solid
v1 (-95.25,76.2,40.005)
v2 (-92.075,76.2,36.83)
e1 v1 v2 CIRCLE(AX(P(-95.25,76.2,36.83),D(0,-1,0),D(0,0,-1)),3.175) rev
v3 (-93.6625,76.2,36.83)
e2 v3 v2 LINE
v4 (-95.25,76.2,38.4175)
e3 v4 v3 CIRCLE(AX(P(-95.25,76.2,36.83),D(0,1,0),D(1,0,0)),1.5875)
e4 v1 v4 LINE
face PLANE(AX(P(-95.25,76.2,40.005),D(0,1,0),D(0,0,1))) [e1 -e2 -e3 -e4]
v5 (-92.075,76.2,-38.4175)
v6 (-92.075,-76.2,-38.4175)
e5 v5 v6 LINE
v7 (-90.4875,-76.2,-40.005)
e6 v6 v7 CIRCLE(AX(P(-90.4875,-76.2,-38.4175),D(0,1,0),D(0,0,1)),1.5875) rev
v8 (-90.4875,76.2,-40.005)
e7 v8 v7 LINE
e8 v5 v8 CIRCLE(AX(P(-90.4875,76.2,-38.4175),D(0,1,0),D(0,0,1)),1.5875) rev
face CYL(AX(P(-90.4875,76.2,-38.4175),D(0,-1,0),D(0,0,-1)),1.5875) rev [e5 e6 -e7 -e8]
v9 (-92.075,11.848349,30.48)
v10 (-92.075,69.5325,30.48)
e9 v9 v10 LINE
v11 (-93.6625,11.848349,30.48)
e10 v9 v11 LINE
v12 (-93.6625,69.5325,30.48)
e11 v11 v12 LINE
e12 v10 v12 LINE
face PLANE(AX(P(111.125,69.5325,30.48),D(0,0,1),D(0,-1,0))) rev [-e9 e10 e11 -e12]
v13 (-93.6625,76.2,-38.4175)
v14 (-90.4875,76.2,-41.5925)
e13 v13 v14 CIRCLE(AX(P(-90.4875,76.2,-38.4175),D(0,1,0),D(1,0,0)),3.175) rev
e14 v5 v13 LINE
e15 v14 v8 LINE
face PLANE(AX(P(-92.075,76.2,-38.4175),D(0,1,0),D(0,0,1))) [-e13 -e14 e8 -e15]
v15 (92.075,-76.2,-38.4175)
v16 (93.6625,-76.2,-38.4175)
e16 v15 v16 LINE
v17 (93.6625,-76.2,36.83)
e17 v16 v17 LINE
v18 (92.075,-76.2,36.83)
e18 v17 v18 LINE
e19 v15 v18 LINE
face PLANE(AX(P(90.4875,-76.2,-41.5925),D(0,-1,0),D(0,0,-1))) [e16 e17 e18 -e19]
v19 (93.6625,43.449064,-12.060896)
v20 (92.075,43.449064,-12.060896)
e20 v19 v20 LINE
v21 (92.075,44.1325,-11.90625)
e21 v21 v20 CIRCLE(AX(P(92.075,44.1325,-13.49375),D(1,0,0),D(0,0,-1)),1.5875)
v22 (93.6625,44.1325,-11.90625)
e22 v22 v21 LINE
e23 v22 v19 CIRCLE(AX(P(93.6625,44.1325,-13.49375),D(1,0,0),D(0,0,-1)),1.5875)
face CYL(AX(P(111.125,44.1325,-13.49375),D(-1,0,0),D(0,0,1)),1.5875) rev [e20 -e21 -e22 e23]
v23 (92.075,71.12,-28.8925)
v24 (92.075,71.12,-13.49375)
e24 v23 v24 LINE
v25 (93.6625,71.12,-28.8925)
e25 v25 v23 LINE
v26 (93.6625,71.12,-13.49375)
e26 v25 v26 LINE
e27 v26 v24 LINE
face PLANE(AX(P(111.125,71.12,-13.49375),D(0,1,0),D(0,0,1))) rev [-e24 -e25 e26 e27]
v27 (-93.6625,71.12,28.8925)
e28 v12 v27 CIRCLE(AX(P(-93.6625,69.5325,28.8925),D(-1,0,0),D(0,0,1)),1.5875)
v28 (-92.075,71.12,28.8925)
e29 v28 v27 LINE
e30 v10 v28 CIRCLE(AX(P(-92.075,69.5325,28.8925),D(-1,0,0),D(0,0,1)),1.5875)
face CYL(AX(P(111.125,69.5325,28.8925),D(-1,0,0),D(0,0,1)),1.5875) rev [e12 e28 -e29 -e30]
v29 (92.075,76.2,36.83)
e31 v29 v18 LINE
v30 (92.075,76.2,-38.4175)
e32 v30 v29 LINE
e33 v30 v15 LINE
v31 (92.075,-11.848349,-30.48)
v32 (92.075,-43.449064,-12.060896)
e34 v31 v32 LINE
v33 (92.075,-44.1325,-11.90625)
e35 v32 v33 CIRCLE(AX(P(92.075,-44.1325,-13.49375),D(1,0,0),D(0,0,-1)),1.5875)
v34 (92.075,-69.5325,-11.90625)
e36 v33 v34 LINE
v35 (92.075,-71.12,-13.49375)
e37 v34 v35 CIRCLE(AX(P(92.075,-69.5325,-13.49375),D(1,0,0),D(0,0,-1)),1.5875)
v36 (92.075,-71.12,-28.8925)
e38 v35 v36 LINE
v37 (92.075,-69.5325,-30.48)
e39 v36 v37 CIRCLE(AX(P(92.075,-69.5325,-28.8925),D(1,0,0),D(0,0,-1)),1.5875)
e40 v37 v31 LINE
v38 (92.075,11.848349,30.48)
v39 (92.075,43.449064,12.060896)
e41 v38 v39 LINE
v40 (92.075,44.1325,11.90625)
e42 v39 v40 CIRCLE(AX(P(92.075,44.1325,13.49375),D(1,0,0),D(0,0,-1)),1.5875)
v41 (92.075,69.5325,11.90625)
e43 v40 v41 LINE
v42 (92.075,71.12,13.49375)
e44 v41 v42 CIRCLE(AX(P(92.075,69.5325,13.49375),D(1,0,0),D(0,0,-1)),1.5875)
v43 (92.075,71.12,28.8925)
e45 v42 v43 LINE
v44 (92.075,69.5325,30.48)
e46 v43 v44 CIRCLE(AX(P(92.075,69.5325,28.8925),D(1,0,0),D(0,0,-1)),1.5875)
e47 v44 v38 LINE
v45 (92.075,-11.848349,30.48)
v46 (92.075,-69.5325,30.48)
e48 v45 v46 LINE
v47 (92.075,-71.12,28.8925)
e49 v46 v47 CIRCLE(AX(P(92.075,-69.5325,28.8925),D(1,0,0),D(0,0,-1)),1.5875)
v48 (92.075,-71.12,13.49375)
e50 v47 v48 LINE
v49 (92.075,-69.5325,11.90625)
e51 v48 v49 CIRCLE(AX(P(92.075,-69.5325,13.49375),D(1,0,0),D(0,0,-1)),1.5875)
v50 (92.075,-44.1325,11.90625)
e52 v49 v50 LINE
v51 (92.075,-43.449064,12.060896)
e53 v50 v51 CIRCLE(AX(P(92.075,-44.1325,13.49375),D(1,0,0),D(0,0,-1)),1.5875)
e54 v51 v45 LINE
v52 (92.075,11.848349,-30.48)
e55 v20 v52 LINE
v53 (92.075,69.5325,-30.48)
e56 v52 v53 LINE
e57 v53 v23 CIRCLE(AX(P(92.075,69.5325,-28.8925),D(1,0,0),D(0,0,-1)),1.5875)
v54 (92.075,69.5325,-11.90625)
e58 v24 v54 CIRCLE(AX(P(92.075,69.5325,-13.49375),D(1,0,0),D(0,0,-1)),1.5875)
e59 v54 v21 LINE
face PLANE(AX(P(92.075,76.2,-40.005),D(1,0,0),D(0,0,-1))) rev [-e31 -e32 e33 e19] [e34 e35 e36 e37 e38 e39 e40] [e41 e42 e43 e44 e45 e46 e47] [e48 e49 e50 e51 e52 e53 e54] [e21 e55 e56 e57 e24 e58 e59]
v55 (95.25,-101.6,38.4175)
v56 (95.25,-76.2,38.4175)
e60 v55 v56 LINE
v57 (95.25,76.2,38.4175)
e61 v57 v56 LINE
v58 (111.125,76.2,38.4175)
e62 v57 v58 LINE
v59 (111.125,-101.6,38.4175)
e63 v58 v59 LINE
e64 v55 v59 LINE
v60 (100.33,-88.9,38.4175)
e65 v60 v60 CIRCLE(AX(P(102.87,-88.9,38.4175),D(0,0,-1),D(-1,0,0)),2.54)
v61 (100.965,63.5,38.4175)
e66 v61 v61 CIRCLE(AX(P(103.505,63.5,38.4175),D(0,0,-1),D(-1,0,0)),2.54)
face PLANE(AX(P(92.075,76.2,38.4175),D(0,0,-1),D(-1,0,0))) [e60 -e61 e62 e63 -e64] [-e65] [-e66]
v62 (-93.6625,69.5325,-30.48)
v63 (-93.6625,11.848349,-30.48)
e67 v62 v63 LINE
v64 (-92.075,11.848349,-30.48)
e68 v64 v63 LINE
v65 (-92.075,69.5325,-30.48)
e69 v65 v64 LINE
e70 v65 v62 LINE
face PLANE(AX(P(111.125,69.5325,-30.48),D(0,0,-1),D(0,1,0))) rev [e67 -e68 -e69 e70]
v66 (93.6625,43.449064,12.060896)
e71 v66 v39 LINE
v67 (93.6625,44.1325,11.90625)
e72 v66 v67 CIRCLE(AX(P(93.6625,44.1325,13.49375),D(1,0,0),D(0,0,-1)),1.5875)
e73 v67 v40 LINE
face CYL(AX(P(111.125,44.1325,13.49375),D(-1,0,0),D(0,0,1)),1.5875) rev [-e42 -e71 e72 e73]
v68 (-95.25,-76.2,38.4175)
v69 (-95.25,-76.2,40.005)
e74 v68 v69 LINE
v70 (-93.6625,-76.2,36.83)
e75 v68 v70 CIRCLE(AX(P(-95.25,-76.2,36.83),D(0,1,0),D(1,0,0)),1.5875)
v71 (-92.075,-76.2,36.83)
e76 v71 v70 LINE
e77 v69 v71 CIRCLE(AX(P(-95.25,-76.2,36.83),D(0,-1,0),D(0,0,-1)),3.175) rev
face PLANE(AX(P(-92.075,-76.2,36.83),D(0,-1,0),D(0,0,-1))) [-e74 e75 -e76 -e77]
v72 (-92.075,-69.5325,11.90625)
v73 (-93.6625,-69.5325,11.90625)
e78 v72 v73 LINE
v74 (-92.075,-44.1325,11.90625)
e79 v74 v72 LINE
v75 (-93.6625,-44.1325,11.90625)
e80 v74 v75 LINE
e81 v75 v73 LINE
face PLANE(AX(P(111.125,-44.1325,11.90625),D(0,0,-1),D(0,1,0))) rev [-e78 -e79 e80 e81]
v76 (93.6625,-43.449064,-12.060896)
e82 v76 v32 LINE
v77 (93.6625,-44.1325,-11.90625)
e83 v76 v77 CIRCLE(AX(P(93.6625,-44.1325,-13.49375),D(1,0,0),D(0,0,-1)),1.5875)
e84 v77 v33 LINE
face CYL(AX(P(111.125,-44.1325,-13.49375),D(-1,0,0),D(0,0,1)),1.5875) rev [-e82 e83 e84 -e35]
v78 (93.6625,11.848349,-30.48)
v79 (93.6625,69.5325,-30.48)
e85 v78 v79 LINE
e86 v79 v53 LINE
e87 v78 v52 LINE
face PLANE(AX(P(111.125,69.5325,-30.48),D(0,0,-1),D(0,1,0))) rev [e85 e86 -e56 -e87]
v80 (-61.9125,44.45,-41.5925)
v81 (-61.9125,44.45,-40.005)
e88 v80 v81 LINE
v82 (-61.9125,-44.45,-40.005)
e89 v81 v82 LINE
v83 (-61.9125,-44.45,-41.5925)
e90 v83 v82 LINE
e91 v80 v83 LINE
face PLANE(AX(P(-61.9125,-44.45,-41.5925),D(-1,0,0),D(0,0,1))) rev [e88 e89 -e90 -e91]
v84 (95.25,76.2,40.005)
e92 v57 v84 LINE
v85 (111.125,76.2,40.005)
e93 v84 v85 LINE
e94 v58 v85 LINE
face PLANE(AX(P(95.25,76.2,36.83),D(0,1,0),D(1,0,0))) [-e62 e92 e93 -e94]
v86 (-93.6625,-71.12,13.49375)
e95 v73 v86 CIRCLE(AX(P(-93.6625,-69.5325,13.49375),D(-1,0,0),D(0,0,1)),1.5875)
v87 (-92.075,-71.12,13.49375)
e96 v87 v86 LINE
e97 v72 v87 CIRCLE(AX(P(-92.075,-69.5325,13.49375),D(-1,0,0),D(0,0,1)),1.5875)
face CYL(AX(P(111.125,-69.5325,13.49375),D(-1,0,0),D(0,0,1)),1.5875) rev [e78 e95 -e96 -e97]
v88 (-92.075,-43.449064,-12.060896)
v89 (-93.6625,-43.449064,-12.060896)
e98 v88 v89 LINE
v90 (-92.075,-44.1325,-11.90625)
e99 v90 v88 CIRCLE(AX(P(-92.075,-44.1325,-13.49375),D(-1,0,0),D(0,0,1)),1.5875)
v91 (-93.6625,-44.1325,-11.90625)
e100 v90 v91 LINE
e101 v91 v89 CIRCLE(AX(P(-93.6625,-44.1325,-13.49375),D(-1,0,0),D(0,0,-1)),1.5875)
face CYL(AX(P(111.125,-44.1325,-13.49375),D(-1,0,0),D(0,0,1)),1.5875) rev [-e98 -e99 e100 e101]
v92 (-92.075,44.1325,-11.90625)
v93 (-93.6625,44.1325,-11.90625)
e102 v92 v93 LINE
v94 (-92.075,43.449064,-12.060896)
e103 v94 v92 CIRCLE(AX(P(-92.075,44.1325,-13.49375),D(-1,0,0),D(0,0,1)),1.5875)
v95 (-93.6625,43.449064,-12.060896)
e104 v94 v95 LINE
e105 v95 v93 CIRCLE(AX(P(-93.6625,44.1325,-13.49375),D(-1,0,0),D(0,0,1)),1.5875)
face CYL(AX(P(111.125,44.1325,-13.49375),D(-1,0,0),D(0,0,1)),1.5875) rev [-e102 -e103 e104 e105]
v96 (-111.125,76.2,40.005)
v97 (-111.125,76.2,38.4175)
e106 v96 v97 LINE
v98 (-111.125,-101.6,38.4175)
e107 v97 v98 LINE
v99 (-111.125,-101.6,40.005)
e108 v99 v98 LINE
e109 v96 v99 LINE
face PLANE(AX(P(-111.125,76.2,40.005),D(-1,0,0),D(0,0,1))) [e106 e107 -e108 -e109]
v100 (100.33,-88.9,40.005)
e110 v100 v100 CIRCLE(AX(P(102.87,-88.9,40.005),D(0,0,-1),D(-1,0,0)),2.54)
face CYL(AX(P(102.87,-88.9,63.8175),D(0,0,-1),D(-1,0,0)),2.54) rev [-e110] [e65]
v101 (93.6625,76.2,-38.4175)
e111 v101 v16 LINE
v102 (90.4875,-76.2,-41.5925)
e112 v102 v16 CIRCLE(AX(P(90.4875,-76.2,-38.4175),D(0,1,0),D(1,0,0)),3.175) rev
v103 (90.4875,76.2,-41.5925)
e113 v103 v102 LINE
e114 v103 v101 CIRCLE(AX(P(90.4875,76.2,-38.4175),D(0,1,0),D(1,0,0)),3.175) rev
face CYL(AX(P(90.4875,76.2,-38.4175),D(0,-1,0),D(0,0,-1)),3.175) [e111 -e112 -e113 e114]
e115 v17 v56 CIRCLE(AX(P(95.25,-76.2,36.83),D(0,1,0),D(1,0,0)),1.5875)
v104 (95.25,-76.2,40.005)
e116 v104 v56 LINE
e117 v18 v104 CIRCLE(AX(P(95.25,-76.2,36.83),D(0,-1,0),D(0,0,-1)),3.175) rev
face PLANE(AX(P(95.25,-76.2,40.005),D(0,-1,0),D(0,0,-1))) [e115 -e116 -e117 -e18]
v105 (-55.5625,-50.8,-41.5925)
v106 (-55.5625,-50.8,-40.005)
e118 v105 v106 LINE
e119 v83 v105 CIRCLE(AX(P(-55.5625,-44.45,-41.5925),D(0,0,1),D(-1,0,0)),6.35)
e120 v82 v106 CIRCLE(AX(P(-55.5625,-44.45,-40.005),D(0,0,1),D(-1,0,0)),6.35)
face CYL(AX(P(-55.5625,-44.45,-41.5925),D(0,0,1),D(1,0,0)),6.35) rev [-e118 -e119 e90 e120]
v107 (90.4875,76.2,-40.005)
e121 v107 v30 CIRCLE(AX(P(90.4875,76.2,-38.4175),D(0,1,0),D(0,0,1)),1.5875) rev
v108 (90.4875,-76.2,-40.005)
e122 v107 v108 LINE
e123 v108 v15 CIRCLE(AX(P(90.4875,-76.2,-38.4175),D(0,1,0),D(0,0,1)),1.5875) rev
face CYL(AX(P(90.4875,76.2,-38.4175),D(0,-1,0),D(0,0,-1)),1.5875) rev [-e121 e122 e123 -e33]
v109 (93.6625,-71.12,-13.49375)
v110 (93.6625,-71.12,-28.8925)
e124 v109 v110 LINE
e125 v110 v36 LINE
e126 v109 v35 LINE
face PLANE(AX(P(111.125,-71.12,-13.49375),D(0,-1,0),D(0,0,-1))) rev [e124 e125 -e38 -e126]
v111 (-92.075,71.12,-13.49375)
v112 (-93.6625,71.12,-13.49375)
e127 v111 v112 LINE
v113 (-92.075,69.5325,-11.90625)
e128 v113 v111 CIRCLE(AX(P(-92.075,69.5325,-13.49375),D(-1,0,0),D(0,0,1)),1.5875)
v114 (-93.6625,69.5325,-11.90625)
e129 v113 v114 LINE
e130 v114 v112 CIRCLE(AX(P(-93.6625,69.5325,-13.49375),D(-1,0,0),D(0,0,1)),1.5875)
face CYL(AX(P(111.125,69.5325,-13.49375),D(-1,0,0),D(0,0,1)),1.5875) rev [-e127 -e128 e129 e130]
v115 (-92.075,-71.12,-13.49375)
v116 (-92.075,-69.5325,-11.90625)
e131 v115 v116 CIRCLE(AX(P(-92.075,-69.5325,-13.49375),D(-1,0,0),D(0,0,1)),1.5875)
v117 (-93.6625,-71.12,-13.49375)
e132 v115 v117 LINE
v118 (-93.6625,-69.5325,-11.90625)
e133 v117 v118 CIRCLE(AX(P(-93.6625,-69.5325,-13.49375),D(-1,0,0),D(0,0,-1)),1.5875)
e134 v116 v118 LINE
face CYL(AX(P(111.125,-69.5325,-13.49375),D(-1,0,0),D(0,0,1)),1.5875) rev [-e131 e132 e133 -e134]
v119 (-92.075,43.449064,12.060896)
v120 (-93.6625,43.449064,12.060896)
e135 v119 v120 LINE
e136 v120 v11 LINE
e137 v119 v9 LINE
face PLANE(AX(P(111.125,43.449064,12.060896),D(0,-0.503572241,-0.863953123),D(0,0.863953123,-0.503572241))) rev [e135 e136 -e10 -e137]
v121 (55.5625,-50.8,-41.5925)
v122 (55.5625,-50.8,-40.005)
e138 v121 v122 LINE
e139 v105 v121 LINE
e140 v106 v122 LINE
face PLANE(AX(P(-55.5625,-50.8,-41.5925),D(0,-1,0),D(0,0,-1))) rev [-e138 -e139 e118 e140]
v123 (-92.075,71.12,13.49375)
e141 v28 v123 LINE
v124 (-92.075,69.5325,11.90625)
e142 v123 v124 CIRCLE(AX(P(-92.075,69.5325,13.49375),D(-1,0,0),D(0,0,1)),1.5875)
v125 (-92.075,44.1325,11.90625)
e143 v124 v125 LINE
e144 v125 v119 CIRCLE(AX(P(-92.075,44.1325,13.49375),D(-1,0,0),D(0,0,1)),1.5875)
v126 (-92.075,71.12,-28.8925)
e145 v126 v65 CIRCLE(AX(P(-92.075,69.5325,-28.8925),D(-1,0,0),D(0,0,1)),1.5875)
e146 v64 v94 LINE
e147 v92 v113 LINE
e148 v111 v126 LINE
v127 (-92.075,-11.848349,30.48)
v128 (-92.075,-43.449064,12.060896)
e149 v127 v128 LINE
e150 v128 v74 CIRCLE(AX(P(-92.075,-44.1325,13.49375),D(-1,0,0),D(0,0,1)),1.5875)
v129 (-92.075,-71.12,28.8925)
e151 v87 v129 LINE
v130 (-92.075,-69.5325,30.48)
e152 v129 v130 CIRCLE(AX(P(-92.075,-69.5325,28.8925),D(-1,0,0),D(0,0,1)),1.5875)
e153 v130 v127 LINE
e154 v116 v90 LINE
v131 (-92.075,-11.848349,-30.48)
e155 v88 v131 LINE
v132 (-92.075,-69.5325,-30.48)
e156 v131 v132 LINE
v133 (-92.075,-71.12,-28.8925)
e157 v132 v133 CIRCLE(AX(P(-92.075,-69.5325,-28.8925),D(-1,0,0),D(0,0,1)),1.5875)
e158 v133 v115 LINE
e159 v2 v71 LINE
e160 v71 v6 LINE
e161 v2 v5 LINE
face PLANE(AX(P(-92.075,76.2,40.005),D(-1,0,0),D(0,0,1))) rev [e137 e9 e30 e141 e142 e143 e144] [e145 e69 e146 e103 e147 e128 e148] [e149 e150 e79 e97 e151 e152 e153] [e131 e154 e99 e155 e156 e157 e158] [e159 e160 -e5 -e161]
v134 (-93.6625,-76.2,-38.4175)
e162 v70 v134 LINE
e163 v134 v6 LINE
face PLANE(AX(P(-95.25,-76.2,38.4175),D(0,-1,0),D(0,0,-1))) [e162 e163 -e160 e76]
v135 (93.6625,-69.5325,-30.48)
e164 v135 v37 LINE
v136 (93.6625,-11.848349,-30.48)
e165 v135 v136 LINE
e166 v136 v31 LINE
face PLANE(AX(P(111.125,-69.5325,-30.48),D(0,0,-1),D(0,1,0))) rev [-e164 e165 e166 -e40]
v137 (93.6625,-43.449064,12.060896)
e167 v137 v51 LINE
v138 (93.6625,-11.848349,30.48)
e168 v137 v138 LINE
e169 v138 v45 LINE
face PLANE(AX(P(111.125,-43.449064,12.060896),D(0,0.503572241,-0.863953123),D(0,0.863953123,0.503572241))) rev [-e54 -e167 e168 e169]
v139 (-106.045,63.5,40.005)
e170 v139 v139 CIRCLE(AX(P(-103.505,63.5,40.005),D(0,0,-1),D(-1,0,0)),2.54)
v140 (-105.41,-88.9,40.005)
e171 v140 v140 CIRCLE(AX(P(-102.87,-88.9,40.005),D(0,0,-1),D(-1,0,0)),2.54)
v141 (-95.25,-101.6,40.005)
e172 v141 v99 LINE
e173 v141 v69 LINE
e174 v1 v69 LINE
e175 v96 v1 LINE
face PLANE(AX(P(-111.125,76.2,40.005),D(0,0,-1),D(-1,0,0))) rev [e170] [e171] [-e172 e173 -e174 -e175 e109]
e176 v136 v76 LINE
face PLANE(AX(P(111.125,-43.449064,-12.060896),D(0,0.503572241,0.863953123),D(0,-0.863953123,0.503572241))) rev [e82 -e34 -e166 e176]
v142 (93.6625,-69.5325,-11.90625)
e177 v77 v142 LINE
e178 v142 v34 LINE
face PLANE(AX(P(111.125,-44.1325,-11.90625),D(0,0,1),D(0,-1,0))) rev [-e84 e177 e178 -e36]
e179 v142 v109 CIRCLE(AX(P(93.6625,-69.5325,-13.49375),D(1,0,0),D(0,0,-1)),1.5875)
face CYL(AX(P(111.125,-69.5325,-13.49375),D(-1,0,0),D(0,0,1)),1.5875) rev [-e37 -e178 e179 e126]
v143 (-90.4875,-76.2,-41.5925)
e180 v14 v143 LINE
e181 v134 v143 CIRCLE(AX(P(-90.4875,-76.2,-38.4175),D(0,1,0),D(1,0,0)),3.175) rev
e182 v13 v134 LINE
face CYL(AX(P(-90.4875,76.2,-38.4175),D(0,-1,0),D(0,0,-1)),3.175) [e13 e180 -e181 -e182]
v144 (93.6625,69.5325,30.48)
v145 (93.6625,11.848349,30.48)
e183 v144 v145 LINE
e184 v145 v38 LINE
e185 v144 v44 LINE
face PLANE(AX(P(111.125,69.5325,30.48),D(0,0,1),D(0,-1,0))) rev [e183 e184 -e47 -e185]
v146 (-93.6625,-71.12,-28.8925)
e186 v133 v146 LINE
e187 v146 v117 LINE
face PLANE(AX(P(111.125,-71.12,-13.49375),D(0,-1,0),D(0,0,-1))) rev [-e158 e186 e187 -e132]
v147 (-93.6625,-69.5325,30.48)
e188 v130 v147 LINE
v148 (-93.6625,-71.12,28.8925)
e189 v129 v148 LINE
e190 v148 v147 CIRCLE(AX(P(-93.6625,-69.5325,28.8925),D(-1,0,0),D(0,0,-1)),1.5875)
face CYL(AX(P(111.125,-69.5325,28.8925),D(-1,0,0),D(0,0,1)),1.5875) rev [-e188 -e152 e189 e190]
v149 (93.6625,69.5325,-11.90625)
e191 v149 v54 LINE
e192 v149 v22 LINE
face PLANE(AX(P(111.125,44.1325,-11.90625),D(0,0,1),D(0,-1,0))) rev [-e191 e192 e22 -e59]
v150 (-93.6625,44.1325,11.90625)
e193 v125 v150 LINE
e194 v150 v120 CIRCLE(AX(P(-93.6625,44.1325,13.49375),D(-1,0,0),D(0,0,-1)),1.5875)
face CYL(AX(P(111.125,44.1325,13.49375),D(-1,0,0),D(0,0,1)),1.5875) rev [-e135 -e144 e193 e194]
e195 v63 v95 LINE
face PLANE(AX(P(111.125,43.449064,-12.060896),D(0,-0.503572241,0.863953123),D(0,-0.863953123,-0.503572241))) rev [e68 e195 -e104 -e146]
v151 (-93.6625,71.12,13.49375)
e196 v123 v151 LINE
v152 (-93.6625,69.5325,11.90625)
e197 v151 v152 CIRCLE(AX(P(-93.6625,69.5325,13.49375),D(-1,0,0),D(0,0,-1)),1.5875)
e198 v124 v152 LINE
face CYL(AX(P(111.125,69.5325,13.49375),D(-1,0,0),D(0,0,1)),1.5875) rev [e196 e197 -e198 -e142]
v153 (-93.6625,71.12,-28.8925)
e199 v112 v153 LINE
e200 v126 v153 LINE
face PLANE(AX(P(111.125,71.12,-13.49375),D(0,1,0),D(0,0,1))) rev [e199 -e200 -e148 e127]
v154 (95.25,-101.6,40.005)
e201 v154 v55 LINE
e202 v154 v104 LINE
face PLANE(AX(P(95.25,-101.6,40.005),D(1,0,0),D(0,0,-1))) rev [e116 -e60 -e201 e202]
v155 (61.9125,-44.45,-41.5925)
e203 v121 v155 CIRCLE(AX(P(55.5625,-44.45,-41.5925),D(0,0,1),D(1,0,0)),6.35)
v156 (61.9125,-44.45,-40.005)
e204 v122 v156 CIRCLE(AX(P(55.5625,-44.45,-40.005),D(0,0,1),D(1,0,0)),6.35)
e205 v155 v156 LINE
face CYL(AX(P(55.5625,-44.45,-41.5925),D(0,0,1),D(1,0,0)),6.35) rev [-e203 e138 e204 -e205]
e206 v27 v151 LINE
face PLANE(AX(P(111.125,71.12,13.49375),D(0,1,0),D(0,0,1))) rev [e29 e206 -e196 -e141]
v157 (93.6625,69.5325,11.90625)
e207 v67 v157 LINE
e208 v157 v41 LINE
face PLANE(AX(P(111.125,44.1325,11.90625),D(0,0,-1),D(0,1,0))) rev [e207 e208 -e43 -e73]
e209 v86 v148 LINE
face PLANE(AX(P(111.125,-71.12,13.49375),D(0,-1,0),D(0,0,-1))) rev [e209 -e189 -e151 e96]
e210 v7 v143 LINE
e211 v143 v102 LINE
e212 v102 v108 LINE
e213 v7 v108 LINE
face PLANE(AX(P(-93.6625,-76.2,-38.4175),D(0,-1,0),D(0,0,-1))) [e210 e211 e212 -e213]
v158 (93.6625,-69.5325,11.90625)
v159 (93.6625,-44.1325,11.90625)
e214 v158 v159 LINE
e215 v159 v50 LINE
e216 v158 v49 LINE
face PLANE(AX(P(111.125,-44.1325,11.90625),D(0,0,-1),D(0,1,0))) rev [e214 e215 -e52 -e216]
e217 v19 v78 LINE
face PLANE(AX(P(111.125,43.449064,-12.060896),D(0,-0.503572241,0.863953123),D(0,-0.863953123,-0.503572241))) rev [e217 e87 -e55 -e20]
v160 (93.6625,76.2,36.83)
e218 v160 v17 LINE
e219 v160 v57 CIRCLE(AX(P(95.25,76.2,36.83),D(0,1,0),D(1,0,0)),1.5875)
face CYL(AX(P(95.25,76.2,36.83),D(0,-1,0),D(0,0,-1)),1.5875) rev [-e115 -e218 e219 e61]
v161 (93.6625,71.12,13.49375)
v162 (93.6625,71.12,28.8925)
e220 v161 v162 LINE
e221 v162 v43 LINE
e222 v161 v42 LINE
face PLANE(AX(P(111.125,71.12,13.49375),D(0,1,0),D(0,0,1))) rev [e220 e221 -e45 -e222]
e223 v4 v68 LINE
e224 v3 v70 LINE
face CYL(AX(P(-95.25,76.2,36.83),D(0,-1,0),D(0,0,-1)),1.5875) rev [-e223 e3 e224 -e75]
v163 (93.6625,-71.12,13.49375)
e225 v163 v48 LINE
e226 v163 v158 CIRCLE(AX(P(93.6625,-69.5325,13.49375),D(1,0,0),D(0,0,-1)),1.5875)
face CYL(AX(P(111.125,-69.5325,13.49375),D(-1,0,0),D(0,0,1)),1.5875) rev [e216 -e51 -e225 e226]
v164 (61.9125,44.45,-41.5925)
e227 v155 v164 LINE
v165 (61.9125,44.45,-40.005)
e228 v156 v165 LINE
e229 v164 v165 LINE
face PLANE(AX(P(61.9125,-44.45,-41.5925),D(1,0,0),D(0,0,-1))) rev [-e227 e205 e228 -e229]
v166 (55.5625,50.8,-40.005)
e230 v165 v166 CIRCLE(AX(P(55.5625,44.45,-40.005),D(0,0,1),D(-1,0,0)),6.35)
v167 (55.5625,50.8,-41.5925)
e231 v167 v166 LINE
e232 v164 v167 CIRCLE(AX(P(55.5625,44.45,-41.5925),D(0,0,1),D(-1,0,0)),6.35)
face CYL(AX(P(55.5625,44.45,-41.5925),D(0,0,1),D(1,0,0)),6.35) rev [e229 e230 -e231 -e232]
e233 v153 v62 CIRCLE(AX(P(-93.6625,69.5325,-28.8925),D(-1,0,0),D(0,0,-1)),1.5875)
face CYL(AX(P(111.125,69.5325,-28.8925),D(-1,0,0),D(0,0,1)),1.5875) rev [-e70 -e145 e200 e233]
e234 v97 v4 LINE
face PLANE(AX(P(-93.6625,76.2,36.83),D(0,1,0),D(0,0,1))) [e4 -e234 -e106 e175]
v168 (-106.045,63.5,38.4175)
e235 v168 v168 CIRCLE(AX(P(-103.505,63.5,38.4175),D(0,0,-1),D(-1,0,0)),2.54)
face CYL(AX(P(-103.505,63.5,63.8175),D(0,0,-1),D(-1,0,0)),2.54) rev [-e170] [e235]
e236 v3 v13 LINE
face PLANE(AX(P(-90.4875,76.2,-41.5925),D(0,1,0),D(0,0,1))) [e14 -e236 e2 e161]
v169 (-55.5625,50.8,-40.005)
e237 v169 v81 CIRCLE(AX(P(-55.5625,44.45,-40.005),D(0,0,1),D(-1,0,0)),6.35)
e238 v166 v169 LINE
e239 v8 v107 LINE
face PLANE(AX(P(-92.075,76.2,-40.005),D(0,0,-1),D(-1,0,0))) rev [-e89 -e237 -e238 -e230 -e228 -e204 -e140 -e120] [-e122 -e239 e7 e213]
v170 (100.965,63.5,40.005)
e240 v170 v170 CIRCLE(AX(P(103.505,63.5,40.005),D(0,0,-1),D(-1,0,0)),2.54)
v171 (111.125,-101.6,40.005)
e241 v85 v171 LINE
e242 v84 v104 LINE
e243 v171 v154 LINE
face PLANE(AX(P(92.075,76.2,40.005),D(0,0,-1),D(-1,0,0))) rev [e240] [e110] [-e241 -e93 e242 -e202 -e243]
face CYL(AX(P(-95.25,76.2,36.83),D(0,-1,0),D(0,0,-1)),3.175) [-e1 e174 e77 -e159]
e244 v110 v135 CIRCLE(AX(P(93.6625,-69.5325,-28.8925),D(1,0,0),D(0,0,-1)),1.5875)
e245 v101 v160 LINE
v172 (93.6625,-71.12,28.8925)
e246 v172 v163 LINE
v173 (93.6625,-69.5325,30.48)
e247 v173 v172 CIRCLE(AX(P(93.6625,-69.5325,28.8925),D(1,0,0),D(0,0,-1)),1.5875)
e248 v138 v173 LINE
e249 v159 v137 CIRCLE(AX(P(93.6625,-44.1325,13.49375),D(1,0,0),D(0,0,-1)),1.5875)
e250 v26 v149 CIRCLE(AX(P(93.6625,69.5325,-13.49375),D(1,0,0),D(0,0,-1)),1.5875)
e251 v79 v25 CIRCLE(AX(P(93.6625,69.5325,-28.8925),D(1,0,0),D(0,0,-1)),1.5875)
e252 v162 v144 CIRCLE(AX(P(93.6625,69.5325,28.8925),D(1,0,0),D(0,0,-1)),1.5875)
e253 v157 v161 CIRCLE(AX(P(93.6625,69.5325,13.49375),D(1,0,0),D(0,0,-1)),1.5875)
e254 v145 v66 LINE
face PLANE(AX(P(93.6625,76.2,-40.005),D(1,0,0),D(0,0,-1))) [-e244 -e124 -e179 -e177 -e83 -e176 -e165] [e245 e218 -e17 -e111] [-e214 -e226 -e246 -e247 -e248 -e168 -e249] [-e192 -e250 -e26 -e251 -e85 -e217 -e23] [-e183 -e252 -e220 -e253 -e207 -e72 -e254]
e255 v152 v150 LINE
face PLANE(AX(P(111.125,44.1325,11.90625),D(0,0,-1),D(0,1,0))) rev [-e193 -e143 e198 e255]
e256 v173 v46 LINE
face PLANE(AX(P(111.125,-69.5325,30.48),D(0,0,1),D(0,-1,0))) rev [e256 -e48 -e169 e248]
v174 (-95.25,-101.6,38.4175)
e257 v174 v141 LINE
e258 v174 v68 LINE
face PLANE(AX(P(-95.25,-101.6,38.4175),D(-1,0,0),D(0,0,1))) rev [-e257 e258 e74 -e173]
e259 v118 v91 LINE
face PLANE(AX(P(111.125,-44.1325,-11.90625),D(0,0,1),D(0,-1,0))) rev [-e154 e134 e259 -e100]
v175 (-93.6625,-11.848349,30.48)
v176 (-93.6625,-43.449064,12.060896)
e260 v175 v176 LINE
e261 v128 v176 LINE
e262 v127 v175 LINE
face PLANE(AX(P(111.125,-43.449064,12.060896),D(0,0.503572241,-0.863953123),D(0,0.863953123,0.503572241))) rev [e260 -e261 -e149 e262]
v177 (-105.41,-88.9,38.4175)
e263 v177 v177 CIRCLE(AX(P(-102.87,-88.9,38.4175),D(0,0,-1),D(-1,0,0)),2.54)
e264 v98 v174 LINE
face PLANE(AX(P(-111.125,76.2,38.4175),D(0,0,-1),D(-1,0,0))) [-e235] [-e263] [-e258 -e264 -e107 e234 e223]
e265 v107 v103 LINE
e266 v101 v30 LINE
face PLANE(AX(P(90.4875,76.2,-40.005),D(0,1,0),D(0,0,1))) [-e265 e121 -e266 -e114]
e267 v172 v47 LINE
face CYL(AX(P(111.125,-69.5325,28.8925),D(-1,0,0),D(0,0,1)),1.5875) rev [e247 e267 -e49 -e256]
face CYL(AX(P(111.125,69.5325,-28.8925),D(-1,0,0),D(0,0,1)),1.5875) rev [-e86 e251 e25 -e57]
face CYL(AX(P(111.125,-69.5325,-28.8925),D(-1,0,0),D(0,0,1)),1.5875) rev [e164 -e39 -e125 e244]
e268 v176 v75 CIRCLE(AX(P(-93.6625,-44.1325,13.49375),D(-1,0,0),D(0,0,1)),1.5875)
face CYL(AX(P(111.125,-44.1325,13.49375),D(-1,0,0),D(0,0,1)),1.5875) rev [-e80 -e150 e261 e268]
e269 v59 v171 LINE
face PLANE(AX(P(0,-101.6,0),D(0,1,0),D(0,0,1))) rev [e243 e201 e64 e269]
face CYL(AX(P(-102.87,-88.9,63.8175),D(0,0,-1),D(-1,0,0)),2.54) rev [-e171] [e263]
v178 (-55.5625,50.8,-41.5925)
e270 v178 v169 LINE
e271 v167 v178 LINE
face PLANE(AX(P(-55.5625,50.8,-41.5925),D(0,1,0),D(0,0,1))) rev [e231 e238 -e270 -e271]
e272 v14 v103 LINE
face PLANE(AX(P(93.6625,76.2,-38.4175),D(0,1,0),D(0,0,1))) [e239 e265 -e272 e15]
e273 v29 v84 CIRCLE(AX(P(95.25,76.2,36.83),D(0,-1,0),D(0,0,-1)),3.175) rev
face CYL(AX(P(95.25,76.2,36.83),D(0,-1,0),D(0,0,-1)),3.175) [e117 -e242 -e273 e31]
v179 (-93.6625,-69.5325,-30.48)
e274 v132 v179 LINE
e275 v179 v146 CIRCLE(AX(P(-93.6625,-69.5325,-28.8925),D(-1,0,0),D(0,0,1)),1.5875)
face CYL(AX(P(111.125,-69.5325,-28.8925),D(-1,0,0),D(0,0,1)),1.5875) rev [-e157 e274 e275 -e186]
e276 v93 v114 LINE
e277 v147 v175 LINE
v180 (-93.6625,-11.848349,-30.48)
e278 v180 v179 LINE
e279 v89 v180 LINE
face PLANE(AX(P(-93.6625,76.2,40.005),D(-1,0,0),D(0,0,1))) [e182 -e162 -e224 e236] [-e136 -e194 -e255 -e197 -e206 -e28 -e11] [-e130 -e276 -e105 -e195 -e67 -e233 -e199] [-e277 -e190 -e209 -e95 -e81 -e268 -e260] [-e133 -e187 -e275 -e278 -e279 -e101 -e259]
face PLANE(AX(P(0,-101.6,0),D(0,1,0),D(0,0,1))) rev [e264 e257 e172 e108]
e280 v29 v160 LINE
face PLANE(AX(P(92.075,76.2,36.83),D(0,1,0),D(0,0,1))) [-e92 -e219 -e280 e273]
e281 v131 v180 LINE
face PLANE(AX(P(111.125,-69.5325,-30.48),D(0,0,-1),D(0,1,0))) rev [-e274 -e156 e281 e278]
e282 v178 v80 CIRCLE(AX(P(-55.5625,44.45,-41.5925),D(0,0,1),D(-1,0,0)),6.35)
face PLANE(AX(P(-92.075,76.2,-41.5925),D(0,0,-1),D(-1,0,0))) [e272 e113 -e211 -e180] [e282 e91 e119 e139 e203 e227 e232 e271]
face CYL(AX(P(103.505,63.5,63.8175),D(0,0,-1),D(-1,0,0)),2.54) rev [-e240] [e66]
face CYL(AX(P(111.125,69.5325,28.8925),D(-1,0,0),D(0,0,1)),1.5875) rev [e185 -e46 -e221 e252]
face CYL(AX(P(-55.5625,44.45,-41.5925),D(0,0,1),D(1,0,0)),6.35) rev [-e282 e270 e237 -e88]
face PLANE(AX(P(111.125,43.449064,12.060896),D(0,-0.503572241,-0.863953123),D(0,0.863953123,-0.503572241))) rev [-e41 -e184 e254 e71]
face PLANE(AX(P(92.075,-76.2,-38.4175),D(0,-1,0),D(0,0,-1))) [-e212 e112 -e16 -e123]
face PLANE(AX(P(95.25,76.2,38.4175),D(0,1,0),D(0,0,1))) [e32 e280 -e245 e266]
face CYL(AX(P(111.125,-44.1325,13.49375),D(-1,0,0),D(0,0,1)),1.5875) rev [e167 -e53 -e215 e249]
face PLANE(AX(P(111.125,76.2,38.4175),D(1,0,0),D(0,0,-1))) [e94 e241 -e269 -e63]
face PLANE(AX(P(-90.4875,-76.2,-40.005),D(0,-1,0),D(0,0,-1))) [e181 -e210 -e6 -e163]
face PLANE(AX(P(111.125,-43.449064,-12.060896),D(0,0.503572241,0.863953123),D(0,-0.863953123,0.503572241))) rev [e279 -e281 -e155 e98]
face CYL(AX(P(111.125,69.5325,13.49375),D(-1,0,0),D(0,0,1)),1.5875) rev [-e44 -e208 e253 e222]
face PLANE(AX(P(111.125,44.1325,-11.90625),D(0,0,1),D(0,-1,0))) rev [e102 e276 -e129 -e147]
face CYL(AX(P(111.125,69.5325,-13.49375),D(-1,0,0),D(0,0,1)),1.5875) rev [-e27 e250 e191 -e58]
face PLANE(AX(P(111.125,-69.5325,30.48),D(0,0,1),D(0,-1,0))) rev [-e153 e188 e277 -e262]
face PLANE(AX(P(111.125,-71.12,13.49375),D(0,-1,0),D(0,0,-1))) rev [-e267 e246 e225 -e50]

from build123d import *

# Parameters (mm, degrees)
BASE_FLANGE1_DEPTH  = 76.2
CUT_EXTRUDE1_DEPTH  = 1.5875
CUT_EXTRUDE4_DEPTH  = 223.428182145
SKETCH11_W          = 15.875
SKETCH11_H          = 1.5875
BOSS_EXTRUDE1_DEPTH = 25.4
SKETCH12_W          = 15.875
SKETCH12_H          = 1.5875
BOSS_EXTRUDE2_DEPTH = 25.4
SKETCH13_R          = 2.54
CUT_EXTRUDE5_DEPTH  = 25.4
SKETCH14_R          = 2.54
CUT_EXTRUDE6_DEPTH  = 25.4
SKETCH15_R          = 2.54
CUT_EXTRUDE7_DEPTH  = 25.4


# Sheet-metal steps are written as plain solids
with BuildPart() as part:
    # Sketch1 → Base-Flange1 (new, symmetric)
    with BuildSketch(Plane(origin=(0, 0, 0), x_dir=(1, 0, 0), z_dir=(0, 1, 0))):
        with BuildLine():
            Line((-111.125, -40.005), (-95.25, -40.005))
            ThreePointArc((-95.25, -40.005), (-93.00493597, -39.07506403), (-92.075, -36.83))
            Line((-92.075, -36.83), (-92.075, 38.4175))
            ThreePointArc((-92.075, 38.4175), (-91.610032015, 39.540032015), (-90.4875, 40.005))
            Line((-90.4875, 40.005), (90.4875, 40.005))
            ThreePointArc((90.4875, 40.005), (91.610032015, 39.540032015), (92.075, 38.4175))
            Line((92.075, 38.4175), (92.075, -36.83))
            ThreePointArc((92.075, -36.83), (93.00493597, -39.07506403), (95.25, -40.005))
            Line((95.25, -40.005), (111.125, -40.005))
            Line((111.125, -40.005), (111.125, -38.4175))
            Line((111.125, -38.4175), (95.25, -38.4175))
            ThreePointArc((95.25, -38.4175), (94.127467985, -37.952532015), (93.6625, -36.83))
            Line((93.6625, -36.83), (93.6625, 38.4175))
            ThreePointArc((93.6625, 38.4175), (92.73256403, 40.66256403), (90.4875, 41.5925))
            Line((90.4875, 41.5925), (-90.4875, 41.5925))
            ThreePointArc((-90.4875, 41.5925), (-92.73256403, 40.66256403), (-93.6625, 38.4175))
            Line((-93.6625, 38.4175), (-93.6625, -36.83))
            ThreePointArc((-93.6625, -36.83), (-94.127467985, -37.952532015), (-95.25, -38.4175))
            Line((-95.25, -38.4175), (-111.125, -38.4175))
            Line((-111.125, -38.4175), (-111.125, -40.005))
        make_face()
    extrude(amount=BASE_FLANGE1_DEPTH, both=True)

    # Sketch6 → Cut-Extrude1 (cut)
    with BuildSketch(Plane.XY.offset(-40.005)):
        with BuildLine():
            Line((-55.5625, -50.8), (55.5625, -50.8))
            ThreePointArc((55.5625, -50.8), (60.052628061, -48.940128061), (61.9125, -44.45))
            Line((61.9125, -44.45), (61.9125, 44.45))
            ThreePointArc((61.9125, 44.45), (60.052628061, 48.940128061), (55.5625, 50.8))
            Line((55.5625, 50.8), (-55.5625, 50.8))
            ThreePointArc((-55.5625, 50.8), (-60.052628061, 48.940128061), (-61.9125, 44.45))
            Line((-61.9125, 44.45), (-61.9125, -44.45))
            ThreePointArc((-61.9125, -44.45), (-60.052628061, -48.940128061), (-55.5625, -50.8))
        make_face()
    extrude(amount=-CUT_EXTRUDE1_DEPTH, mode=Mode.SUBTRACT)

    # Sketch10 → Cut-Extrude4 (cut, through all)
    with BuildSketch(Plane.ZY.offset(93.6625)):
        with BuildLine():
            Line((12.060895861, 43.449063634), (30.48, 11.848349253))
            Line((30.48, 11.848349253), (30.48, 69.5325))
            ThreePointArc((30.48, 69.5325), (30.015032015, 70.655032015), (28.8925, 71.12))
            Line((28.8925, 71.12), (13.49375, 71.12))
            ThreePointArc((13.49375, 71.12), (12.371217985, 70.655032015), (11.90625, 69.5325))
            Line((11.90625, 69.5325), (11.90625, 44.1325))
            ThreePointArc((11.90625, 44.1325), (11.945394066, 43.782142822), (12.060895861, 43.449063634))
        make_face()
        with BuildLine():
            Line((-13.49375, 71.12), (-28.8925, 71.12))
            ThreePointArc((-28.8925, 71.12), (-30.015032015, 70.655032015), (-30.48, 69.5325))
            Line((-30.48, 69.5325), (-30.48, 11.848349253))
            Line((-30.48, 11.848349253), (-12.060895861, 43.449063634))
            ThreePointArc((-12.060895861, 43.449063634), (-11.945394066, 43.782142822), (-11.90625, 44.1325))
            Line((-11.90625, 44.1325), (-11.90625, 69.5325))
            ThreePointArc((-11.90625, 69.5325), (-12.371217985, 70.655032015), (-13.49375, 71.12))
        make_face()
        with BuildLine():
            Line((30.48, -69.5325), (30.48, -11.848349253))
            Line((30.48, -11.848349253), (12.060895861, -43.449063634))
            ThreePointArc((12.060895861, -43.449063634), (11.945394066, -43.782142822), (11.90625, -44.1325))
            Line((11.90625, -44.1325), (11.90625, -69.5325))
            ThreePointArc((11.90625, -69.5325), (12.371217985, -70.655032015), (13.49375, -71.12))
            Line((13.49375, -71.12), (28.8925, -71.12))
            ThreePointArc((28.8925, -71.12), (30.015032015, -70.655032015), (30.48, -69.5325))
        make_face()
        with BuildLine():
            Line((-12.060895861, -43.449063634), (-30.48, -11.848349253))
            Line((-30.48, -11.848349253), (-30.48, -69.5325))
            ThreePointArc((-30.48, -69.5325), (-30.015032015, -70.655032015), (-28.8925, -71.12))
            Line((-28.8925, -71.12), (-13.49375, -71.12))
            ThreePointArc((-13.49375, -71.12), (-12.371217985, -70.655032015), (-11.90625, -69.5325))
            Line((-11.90625, -69.5325), (-11.90625, -44.1325))
            ThreePointArc((-11.90625, -44.1325), (-11.945394066, -43.782142822), (-12.060895861, -43.449063634))
        make_face()
    extrude(amount=-CUT_EXTRUDE4_DEPTH, mode=Mode.SUBTRACT)

    # Sketch11 → Boss-Extrude1 (add)
    with BuildSketch(Plane.XZ.offset(76.2)):
        with Locations((103.1875, 39.21125)):
            Rectangle(SKETCH11_W, SKETCH11_H)
    extrude(amount=BOSS_EXTRUDE1_DEPTH)

    # Sketch12 → Boss-Extrude2 (add)
    with BuildSketch(Plane(origin=(0, -76.2, 0), x_dir=(-1, 0, 0), z_dir=(0, -1, 0))):
        with Locations((103.1875, -39.21125)):
            Rectangle(SKETCH12_W, SKETCH12_H)
    extrude(amount=BOSS_EXTRUDE2_DEPTH)

    # Sketch13 → Cut-Extrude5 (cut)
    with BuildSketch(Plane(origin=(0, 0, 38.4175), x_dir=(-1, 0, 0), z_dir=(0, 0, -1))):
        with Locations((-102.87, -88.9)):
            Circle(SKETCH13_R)
        with Locations((-103.505, 63.5)):
            Circle(SKETCH13_R)
    extrude(amount=-CUT_EXTRUDE5_DEPTH, mode=Mode.SUBTRACT)

    # Sketch14 → Cut-Extrude6 (cut)
    with BuildSketch(Plane(origin=(0, 0, 38.4175), x_dir=(-1, 0, 0), z_dir=(0, 0, -1))):
        with Locations((103.505, 63.5)):
            Circle(SKETCH14_R)
    extrude(amount=-CUT_EXTRUDE6_DEPTH, mode=Mode.SUBTRACT)

    # Sketch15 → Cut-Extrude7 (cut)
    with BuildSketch(Plane(origin=(0, 0, 38.4175), x_dir=(-1, 0, 0), z_dir=(0, 0, -1))):
        with Locations((102.87, -88.9)):
            Circle(SKETCH15_R)
    extrude(amount=-CUT_EXTRUDE7_DEPTH, mode=Mode.SUBTRACT)


solid = part.part
